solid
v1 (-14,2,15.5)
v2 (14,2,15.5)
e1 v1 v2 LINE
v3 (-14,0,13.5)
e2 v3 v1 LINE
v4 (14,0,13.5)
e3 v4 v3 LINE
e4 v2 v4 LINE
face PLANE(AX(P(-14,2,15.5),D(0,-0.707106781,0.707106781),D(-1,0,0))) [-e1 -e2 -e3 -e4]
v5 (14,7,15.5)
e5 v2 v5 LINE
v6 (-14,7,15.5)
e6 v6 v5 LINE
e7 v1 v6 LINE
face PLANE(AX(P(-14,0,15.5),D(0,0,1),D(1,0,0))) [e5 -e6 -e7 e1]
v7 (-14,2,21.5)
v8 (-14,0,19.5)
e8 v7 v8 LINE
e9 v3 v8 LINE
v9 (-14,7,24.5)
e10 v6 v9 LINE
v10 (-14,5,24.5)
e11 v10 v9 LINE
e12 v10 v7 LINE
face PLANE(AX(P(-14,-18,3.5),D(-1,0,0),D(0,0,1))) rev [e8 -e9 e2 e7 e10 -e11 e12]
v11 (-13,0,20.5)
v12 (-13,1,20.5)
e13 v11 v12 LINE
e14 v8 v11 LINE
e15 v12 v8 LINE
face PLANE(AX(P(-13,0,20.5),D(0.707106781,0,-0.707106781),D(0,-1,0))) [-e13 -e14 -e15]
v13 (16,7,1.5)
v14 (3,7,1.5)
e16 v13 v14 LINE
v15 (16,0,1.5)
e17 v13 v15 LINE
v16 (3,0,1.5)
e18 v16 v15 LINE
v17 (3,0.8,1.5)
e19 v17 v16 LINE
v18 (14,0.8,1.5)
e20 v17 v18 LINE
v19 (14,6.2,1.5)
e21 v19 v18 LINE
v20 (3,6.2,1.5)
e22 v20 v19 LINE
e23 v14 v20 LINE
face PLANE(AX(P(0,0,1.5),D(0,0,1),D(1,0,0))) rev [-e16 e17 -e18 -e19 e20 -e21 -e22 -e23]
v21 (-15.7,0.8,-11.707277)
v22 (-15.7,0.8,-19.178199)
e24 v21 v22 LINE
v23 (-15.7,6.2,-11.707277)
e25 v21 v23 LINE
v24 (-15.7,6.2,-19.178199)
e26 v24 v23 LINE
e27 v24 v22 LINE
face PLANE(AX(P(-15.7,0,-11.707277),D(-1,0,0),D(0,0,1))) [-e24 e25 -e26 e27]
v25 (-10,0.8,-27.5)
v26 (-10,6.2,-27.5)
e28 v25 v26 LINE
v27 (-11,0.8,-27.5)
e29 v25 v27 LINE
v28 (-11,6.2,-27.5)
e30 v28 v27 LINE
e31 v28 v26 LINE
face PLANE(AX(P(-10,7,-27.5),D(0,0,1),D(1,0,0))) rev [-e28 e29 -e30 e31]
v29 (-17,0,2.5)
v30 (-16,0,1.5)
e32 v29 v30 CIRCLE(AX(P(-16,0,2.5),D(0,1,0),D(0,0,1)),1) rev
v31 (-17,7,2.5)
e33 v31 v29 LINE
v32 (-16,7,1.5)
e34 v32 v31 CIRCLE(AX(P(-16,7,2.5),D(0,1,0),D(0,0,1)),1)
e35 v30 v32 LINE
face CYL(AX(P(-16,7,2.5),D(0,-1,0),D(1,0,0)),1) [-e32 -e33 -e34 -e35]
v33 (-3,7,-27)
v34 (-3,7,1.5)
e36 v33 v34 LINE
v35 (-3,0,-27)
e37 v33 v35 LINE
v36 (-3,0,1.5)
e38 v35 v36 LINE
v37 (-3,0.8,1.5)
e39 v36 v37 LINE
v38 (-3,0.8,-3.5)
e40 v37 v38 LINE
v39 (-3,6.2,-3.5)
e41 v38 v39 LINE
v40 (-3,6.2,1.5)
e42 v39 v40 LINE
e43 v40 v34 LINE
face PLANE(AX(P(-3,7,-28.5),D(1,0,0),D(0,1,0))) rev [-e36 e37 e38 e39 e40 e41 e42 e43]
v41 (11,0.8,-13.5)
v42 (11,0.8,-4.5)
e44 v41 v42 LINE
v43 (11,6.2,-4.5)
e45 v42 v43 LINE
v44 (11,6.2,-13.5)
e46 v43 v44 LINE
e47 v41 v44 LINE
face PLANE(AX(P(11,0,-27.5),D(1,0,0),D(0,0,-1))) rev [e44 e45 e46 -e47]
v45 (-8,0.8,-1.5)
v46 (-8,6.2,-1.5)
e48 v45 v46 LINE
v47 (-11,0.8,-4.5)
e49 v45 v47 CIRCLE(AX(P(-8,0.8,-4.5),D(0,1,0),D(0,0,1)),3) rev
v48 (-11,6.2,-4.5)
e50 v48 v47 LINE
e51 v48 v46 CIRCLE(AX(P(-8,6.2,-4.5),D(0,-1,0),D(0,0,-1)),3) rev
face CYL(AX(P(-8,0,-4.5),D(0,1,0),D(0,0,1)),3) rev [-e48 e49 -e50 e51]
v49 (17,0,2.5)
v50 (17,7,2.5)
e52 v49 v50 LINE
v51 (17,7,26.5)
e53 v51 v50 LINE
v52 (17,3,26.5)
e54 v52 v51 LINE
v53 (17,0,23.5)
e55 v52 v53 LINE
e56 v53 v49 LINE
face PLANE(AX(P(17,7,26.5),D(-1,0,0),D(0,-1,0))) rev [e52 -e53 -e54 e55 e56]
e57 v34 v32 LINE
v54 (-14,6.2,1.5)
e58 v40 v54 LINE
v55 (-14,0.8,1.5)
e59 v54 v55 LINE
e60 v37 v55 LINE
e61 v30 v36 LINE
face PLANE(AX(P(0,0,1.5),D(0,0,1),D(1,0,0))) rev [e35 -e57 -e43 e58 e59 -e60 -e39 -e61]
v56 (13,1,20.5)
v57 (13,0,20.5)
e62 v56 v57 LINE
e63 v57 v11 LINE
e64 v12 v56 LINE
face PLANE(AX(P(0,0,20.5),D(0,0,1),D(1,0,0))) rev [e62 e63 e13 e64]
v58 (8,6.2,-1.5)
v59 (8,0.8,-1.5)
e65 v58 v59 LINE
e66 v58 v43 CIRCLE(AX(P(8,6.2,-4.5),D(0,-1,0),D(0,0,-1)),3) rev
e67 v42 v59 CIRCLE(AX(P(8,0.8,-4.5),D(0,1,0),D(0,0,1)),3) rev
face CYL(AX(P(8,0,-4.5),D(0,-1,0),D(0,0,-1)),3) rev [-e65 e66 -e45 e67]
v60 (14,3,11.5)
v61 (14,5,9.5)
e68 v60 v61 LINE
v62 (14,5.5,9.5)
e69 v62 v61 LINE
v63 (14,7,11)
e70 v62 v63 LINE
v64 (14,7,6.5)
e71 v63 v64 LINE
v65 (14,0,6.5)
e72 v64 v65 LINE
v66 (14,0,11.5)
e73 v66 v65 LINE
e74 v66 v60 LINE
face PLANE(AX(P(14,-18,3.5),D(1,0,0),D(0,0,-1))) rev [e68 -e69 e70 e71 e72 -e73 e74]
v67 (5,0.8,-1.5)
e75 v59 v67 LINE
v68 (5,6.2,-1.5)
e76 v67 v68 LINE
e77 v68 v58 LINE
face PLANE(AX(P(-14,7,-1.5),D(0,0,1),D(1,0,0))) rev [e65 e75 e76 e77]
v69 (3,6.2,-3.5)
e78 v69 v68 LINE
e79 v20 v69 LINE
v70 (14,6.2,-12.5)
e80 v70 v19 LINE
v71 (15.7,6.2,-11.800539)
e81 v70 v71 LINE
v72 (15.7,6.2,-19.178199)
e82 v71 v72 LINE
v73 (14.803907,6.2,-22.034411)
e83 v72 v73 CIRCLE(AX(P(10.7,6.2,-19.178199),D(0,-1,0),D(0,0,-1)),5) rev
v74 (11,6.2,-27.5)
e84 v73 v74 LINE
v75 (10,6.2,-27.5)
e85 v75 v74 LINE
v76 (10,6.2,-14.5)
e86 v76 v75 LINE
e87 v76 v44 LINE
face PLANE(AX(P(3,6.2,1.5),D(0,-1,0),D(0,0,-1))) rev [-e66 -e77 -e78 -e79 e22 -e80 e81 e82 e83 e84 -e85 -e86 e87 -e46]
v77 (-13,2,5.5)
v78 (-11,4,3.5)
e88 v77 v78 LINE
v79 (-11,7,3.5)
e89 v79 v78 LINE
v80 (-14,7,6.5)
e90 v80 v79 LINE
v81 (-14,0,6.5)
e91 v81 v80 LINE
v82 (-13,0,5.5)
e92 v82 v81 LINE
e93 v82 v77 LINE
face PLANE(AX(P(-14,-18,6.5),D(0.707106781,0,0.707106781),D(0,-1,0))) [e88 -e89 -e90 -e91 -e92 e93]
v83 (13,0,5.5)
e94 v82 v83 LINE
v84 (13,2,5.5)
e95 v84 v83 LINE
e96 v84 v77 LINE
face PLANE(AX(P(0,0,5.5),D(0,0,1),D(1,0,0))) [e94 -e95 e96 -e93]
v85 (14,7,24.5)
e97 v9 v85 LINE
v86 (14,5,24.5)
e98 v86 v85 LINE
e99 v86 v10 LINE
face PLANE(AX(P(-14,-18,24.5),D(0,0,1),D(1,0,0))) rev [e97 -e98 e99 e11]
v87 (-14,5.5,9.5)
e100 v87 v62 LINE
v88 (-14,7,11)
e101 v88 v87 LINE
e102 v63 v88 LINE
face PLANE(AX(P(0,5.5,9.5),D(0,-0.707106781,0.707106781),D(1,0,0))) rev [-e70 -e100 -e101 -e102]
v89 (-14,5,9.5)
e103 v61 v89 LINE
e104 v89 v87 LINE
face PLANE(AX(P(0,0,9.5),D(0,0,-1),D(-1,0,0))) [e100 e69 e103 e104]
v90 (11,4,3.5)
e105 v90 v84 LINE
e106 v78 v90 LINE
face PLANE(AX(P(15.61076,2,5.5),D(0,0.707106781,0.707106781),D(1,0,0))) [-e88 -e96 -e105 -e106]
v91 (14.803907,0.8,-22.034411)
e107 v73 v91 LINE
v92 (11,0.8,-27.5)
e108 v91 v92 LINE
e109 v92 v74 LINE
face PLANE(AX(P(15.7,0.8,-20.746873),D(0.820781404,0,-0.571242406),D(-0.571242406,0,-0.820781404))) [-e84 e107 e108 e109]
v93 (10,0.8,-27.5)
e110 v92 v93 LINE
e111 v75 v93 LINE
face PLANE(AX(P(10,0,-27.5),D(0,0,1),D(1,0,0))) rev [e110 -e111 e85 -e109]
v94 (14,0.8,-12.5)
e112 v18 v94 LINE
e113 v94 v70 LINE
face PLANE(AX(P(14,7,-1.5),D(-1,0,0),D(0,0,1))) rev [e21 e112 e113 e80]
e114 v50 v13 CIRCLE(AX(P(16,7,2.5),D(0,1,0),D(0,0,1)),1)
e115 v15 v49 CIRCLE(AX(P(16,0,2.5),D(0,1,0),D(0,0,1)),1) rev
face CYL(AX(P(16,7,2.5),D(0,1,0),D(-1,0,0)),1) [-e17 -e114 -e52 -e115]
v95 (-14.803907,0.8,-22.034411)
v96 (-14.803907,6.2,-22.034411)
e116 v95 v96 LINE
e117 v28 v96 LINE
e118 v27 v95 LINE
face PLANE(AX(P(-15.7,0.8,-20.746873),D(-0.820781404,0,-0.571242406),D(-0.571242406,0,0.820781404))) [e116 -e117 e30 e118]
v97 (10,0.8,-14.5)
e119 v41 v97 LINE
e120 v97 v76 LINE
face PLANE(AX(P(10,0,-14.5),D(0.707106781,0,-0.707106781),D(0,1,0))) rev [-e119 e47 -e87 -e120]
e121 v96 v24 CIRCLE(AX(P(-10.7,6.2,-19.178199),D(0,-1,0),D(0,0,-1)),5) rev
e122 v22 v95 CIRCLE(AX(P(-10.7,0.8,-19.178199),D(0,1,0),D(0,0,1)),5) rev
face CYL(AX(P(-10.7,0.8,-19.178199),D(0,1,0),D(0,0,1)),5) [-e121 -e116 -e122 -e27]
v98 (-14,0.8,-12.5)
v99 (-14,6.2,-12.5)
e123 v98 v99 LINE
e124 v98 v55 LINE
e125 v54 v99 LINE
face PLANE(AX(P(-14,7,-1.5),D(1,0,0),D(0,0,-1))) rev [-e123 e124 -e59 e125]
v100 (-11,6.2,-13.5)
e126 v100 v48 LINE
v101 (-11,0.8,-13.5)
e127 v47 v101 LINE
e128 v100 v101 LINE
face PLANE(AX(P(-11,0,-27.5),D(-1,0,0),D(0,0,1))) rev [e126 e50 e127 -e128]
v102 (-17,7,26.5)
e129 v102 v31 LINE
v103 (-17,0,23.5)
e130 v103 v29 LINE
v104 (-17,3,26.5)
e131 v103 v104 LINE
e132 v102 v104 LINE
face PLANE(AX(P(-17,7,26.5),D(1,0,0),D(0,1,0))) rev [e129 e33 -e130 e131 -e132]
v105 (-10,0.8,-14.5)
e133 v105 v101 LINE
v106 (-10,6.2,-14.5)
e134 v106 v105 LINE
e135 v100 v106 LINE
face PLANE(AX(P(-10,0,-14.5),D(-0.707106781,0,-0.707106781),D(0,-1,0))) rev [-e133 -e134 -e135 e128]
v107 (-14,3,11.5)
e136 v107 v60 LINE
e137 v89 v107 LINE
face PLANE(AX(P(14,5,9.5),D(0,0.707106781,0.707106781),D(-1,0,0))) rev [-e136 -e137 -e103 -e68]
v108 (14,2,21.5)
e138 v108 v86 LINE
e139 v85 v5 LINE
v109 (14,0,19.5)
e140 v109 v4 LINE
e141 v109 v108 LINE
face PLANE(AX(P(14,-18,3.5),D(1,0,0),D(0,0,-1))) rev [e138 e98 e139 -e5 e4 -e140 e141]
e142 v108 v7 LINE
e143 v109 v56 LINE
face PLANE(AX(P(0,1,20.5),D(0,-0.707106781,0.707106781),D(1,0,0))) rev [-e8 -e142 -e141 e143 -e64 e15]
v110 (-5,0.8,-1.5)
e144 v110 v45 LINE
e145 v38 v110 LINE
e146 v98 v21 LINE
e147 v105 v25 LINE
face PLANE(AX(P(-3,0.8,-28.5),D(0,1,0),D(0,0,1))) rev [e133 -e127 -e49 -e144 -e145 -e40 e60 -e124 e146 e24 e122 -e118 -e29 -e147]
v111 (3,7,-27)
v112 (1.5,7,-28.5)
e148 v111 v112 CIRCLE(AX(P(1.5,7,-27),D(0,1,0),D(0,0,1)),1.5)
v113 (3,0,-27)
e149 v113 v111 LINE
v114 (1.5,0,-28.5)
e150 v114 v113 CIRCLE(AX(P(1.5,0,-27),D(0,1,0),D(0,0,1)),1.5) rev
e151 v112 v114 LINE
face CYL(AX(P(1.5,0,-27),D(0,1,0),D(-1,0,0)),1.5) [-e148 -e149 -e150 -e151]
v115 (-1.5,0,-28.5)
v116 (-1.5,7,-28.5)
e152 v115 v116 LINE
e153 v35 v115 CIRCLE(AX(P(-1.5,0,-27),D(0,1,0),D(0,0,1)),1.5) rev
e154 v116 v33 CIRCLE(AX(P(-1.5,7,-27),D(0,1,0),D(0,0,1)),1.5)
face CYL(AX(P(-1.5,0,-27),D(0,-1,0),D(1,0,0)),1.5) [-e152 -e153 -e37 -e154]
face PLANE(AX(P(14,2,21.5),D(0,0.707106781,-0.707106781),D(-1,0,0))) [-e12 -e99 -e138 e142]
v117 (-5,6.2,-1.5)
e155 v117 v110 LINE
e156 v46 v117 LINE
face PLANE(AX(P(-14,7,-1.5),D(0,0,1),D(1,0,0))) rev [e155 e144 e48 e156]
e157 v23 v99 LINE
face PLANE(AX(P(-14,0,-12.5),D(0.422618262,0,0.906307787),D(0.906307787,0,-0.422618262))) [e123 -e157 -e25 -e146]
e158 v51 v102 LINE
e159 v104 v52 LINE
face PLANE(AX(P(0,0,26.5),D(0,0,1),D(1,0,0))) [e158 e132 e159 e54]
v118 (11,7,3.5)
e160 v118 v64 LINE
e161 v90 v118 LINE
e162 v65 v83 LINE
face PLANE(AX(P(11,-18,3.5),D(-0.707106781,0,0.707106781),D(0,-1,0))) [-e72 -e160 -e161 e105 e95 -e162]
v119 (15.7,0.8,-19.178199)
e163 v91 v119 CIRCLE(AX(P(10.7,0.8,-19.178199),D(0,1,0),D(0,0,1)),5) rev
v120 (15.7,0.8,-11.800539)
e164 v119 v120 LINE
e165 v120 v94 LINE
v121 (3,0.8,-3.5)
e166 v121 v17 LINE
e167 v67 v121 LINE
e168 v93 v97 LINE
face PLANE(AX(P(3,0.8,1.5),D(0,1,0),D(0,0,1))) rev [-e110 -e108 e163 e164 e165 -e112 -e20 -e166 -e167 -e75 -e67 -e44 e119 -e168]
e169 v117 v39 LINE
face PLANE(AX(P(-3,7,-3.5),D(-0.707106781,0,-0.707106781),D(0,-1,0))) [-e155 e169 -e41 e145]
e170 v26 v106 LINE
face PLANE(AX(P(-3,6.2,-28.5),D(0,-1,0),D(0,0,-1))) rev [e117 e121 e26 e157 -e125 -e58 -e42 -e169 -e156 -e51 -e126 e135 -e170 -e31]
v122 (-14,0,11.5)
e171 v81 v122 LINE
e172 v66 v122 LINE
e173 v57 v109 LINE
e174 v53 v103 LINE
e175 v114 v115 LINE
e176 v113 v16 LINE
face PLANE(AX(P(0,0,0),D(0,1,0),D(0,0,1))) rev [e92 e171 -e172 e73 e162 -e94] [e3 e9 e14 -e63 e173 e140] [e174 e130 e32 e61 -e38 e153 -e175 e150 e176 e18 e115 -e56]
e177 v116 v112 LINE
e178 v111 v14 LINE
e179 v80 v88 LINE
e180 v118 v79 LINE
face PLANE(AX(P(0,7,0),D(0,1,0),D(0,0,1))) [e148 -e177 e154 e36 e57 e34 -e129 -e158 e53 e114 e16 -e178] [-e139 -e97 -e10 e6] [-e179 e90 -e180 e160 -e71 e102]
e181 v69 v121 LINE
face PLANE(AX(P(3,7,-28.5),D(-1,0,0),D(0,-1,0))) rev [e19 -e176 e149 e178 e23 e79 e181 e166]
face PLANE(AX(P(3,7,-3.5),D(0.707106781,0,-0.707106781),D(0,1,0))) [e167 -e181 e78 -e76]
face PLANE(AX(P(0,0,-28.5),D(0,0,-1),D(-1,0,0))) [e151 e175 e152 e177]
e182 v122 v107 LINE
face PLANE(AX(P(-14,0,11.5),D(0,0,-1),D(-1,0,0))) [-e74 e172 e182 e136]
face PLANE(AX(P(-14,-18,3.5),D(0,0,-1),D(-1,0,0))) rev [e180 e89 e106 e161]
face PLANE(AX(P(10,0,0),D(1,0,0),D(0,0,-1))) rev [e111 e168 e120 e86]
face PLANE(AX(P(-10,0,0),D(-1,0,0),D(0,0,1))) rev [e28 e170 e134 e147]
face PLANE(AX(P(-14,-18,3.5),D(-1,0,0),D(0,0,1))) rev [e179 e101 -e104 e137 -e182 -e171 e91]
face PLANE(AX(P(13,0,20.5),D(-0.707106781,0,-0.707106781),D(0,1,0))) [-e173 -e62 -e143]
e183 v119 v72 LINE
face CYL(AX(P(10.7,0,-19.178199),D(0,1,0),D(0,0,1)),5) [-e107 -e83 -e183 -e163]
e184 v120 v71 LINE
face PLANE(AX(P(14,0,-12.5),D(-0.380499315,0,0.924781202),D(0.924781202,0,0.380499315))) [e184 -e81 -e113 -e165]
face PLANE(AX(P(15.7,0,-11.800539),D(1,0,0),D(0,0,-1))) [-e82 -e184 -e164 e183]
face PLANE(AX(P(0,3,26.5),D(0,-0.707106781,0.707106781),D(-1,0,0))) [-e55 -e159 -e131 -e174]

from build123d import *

# Parameters (mm, degrees)
SKETCH1_W            = 28
SKETCH1_H            = 3
BOSS_EXTRUDE1_DEPTH  = 7
SKETCH2_W            = 3
SKETCH2_H            = 7
BOSS_EXTRUDE2_DEPTH  = 26
SKETCH3_W            = 6
SKETCH3_H            = 7
BOSS_EXTRUDE3_DEPTH  = 27
BOSS_EXTRUDE4_DEPTH  = 7
CHAMFER1_SIZE        = 2
FILLET1_R            = 3
CUT_EXTRUDE1_DEPTH   = 8
SKETCH6_W            = 34
SKETCH6_H            = 7
BOSS_EXTRUDE5_DEPTH  = 25
SKETCH8_W            = 28
SKETCH8_H            = 21
CUT_EXTRUDE2_DEPTH   = 25
CHAMFER2_SIZE        = 3
FILLET2_R            = 1
SKETCH9_W            = 28
SKETCH9_H            = 4
BOSS_EXTRUDE6_DEPTH  = 7
SKETCH10_W           = 28
SKETCH10_H           = 2
BOSS_EXTRUDE7_DEPTH  = 4
CHAMFER3_SIZE        = 1
CHAMFER4_SIZE        = 3
CHAMFER5_SIZE        = 2
FILLET4_R            = 1.5
SKETCH11_W           = 14
SKETCH11_H           = 7
BOSS_EXTRUDE8_DEPTH  = 1
CHAMFER6_SIZE        = 1
SKETCH12_W           = 14
SKETCH12_H           = 7
BOSS_EXTRUDE9_DEPTH  = 1
CHAMFER7_SIZE        = 1
SKETCH13_W           = 30
SKETCH13_H           = 0.8
CUT_EXTRUDE3_DEPTH   = 12.7
SKETCH14_W           = 30
SKETCH14_H           = 0.8
CUT_EXTRUDE4_DEPTH   = 12.7
BOSS_EXTRUDE10_DEPTH = 5.4
FILLET5_R            = 5
CHAMFER8_SIZE        = 3
SKETCH16_W           = 28
SKETCH16_H           = 2
BOSS_EXTRUDE11_DEPTH = 2
CHAMFER9_SIZE        = 2
SKETCH17_W           = 30.68644474
SKETCH17_H           = 2
BOSS_EXTRUDE12_DEPTH = 2
CHAMFER10_SIZE       = 2
CHAMFER11_SIZE       = 1.5
CHAMFER12_SIZE       = 1


with BuildPart() as part:
    # Sketch1 → Boss-Extrude1 (new body)
    with BuildSketch(Plane(origin=(0, 0, 0), x_dir=(1, 0, 0), z_dir=(0, 1, 0))):
        Rectangle(SKETCH1_W, SKETCH1_H)
    extrude(amount=BOSS_EXTRUDE1_DEPTH)

    # Sketch2 → Boss-Extrude2 (add)
    with BuildSketch(Plane(origin=(0, 0, -1.5), x_dir=(-1, 0, 0), z_dir=(0, 0, -1))):
        with Locations((12.5, 3.5)):
            Rectangle(SKETCH2_W, SKETCH2_H)
        with Locations((-12.5, 3.5)):
            Rectangle(SKETCH2_W, SKETCH2_H)
    extrude(amount=BOSS_EXTRUDE2_DEPTH)

    # Sketch3 → Boss-Extrude3 (add)
    with BuildSketch(Plane(origin=(0, 0, -1.5), x_dir=(-1, 0, 0), z_dir=(0, 0, -1))):
        with Locations((0, 3.5)):
            Rectangle(SKETCH3_W, SKETCH3_H)
    extrude(amount=BOSS_EXTRUDE3_DEPTH)

    # Sketch4 → Boss-Extrude4 (add)
    with BuildSketch(Plane(origin=(0, 7, 0), x_dir=(1, 0, 0), z_dir=(0, 1, 0))):
        Polygon((-14, 12.5), (-15.7, 11.707276981), (-15.7, 16.707276981), (-14, 19.5), align=None)
        Polygon((14, 12.5), (15.7, 11.800538513), (15.7, 16.800538513), (14, 19.5), align=None)
    extrude(amount=-BOSS_EXTRUDE4_DEPTH)

    # Chamfer1
    chamfer1_edges = [part.edges().sort_by_distance(p)[0] for p in [
        (3, 3.5, -1.5),
        (-3, 3.5, -1.5),
    ]]
    chamfer(chamfer1_edges, length=CHAMFER1_SIZE)

    # Fillet1
    fillet1_edges = [part.edges().sort_by_distance(p)[0] for p in [
        (-11, 3.5, -1.5),
        (11, 3.5, -1.5),
    ]]
    fillet(fillet1_edges, radius=FILLET1_R)

    # Sketch5 → Cut-Extrude1 (cut)
    with BuildSketch(Plane(origin=(0, 7, 0), x_dir=(1, 0, 0), z_dir=(0, 1, 0))):
        Polygon((-14, 21.5), (-11, 27.5), (-14, 27.5), align=None)
        Polygon((14, 21.5), (11, 27.5), (14, 27.5), align=None)
    extrude(amount=-CUT_EXTRUDE1_DEPTH, mode=Mode.SUBTRACT)

    # Sketch6 → Boss-Extrude5 (add)
    with BuildSketch(Plane.XY.offset(1.5)):
        with Locations((0, 3.5)):
            Rectangle(SKETCH6_W, SKETCH6_H)
    extrude(amount=BOSS_EXTRUDE5_DEPTH)

    # Sketch8 → Cut-Extrude2 (cut)
    with BuildSketch(Plane(origin=(0, 7, 0), x_dir=(1, 0, 0), z_dir=(0, 1, 0))):
        with Locations((0, -14)):
            Rectangle(SKETCH8_W, SKETCH8_H)
    extrude(amount=-CUT_EXTRUDE2_DEPTH, mode=Mode.SUBTRACT)

    # Chamfer2
    chamfer2_edges = [part.edges().sort_by_distance(p)[0] for p in [
        (-14, 3.5, 3.5),
        (14, 3.5, 3.5),
    ]]
    chamfer(chamfer2_edges, length=CHAMFER2_SIZE)

    # Fillet2
    fillet2_edges = [part.edges().sort_by_distance(p)[0] for p in [
        (-17, 3.5, 1.5),
        (17, 3.5, 1.5),
    ]]
    fillet(fillet2_edges, radius=FILLET2_R)

    # Sketch9 → Boss-Extrude6 (add)
    with BuildSketch(Plane(origin=(0, 7, 0), x_dir=(1, 0, 0), z_dir=(0, 1, 0))):
        with Locations((0, -13.5)):
            Rectangle(SKETCH9_W, SKETCH9_H)
    extrude(amount=-BOSS_EXTRUDE6_DEPTH)

    # Sketch10 → Boss-Extrude7 (add)
    with BuildSketch(Plane(origin=(0, 0, 24.5), x_dir=(-1, 0, 0), z_dir=(0, 0, -1))):
        with Locations((0, 1)):
            Rectangle(SKETCH10_W, SKETCH10_H)
    extrude(amount=BOSS_EXTRUDE7_DEPTH)

    # Chamfer3
    chamfer3_edges = [part.edges().sort_by_distance(p)[0] for p in [
        (0, 2, 20.5),
    ]]
    chamfer(chamfer3_edges, length=CHAMFER3_SIZE)

    # Chamfer4
    chamfer4_edges = [part.edges().sort_by_distance(p)[0] for p in [
        (0, 2, 24.5),
    ]]
    chamfer(chamfer4_edges, length=CHAMFER4_SIZE - 0.0001)  # a hair under: the kernel refuses the full size

    # Chamfer5
    chamfer5_edges = [part.edges().sort_by_distance(p)[0] for p in [
        (0, 0, 15.5),
    ]]
    chamfer(chamfer5_edges, length=CHAMFER5_SIZE)

    # Fillet4
    fillet4_edges = [part.edges().sort_by_distance(p)[0] for p in [
        (3, 3.5, -28.5),
        (-3, 3.5, -28.5),
    ]]
    fillet(fillet4_edges, radius=FILLET4_R)

    # Sketch11 → Boss-Extrude8 (add)
    with BuildSketch(Plane(origin=(-11, 0, 0), x_dir=(0, 0, -1), z_dir=(1, 0, 0))):
        with Locations((20.5, 3.5)):
            Rectangle(SKETCH11_W, SKETCH11_H)
    extrude(amount=BOSS_EXTRUDE8_DEPTH)

    # Chamfer6
    chamfer6_edges = [part.edges().sort_by_distance(p)[0] for p in [
        (-10, 3.5, -13.5),
    ]]
    chamfer(chamfer6_edges, length=CHAMFER6_SIZE - 0.0001)  # a hair under: the kernel refuses the full size

    # Sketch12 → Boss-Extrude9 (add)
    with BuildSketch(Plane.ZY.offset(-11)):
        with Locations((-20.5, 3.5)):
            Rectangle(SKETCH12_W, SKETCH12_H)
    extrude(amount=BOSS_EXTRUDE9_DEPTH)

    # Chamfer7
    chamfer7_edges = [part.edges().sort_by_distance(p)[0] for p in [
        (10, 3.5, -13.5),
    ]]
    chamfer(chamfer7_edges, length=CHAMFER7_SIZE - 0.0001)  # a hair under: the kernel refuses the full size

    # Sketch13 → Cut-Extrude3 (cut)
    with BuildSketch(Plane(origin=(15.7, 0, 0), x_dir=(0, 0, -1), z_dir=(1, 0, 0))):
        with Locations((13.5, 6.6)):
            Rectangle(SKETCH13_W, SKETCH13_H)
        with Locations((13.5, 0.4)):
            Rectangle(SKETCH13_W, SKETCH13_H)
    extrude(amount=-CUT_EXTRUDE3_DEPTH, mode=Mode.SUBTRACT)

    # Sketch14 → Cut-Extrude4 (cut)
    with BuildSketch(Plane.ZY.offset(15.7)):
        with Locations((-13.5, 6.6)):
            Rectangle(SKETCH14_W, SKETCH14_H)
        with Locations((-13.5, 0.4)):
            Rectangle(SKETCH14_W, SKETCH14_H)
    extrude(amount=-CUT_EXTRUDE4_DEPTH, mode=Mode.SUBTRACT)

    # Sketch15 → Boss-Extrude10 (add)
    with BuildSketch(Plane(origin=(0, 6.2, 0), x_dir=(1, 0, 0), z_dir=(0, 1, 0))):
        Polygon((-15.7, 16.707276981), (-15.7, 20.746872846), (-11, 27.5), (-14, 19.5), align=None)
        Polygon((15.7, 16.800538513), (15.7, 20.746872846), (11, 27.5), (14, 19.5), align=None)
    extrude(amount=-BOSS_EXTRUDE10_DEPTH)

    # Fillet5
    fillet5_edges = [part.edges().sort_by_distance(p)[0] for p in [
        (-15.7, 3.5, -20.746872846),
        (15.7, 3.5, -20.746872846),
    ]]
    fillet(fillet5_edges, radius=FILLET5_R)

    # Chamfer8
    chamfer8_edges = [part.edges().sort_by_distance(p)[0] for p in [
        (0, 0, 26.5),
    ]]
    chamfer(chamfer8_edges, length=CHAMFER8_SIZE)

    # Sketch16 → Boss-Extrude11 (add)
    with BuildSketch(Plane(origin=(0, 0, 11.5), x_dir=(-1, 0, 0), z_dir=(0, 0, -1))):
        with Locations((0, 6)):
            Rectangle(SKETCH16_W, SKETCH16_H)
    extrude(amount=BOSS_EXTRUDE11_DEPTH)

    # Chamfer9
    chamfer9_edges = [part.edges().sort_by_distance(p)[0] for p in [
        (0, 5, 11.5),
    ]]
    chamfer(chamfer9_edges, length=CHAMFER9_SIZE - 0.0001)  # a hair under: the kernel refuses the full size

    # Sketch17 → Boss-Extrude12 (add)
    with BuildSketch(Plane.XY.offset(3.5)):
        with Locations((0.267537513, 1)):
            Rectangle(SKETCH17_W, SKETCH17_H)
    extrude(amount=BOSS_EXTRUDE12_DEPTH)

    # Chamfer10
    chamfer10_edges = [part.edges().sort_by_distance(p)[0] for p in [
        (0, 2, 3.5),
    ]]
    chamfer(chamfer10_edges, length=CHAMFER10_SIZE - 0.0001)  # a hair under: the kernel refuses the full size

    # Chamfer11
    chamfer11_edges = [part.edges().sort_by_distance(p)[0] for p in [
        (0, 7, 9.5),
    ]]
    chamfer(chamfer11_edges, length=CHAMFER11_SIZE)

    # Chamfer12
    chamfer12_edges = [part.edges().sort_by_distance(p)[0] for p in [
        (-14, 0.5, 20.5),
        (14, 0.5, 20.5),
    ]]
    chamfer(chamfer12_edges, length=CHAMFER12_SIZE - 0.0001)  # a hair under: the kernel refuses the full size


solid = part.part
